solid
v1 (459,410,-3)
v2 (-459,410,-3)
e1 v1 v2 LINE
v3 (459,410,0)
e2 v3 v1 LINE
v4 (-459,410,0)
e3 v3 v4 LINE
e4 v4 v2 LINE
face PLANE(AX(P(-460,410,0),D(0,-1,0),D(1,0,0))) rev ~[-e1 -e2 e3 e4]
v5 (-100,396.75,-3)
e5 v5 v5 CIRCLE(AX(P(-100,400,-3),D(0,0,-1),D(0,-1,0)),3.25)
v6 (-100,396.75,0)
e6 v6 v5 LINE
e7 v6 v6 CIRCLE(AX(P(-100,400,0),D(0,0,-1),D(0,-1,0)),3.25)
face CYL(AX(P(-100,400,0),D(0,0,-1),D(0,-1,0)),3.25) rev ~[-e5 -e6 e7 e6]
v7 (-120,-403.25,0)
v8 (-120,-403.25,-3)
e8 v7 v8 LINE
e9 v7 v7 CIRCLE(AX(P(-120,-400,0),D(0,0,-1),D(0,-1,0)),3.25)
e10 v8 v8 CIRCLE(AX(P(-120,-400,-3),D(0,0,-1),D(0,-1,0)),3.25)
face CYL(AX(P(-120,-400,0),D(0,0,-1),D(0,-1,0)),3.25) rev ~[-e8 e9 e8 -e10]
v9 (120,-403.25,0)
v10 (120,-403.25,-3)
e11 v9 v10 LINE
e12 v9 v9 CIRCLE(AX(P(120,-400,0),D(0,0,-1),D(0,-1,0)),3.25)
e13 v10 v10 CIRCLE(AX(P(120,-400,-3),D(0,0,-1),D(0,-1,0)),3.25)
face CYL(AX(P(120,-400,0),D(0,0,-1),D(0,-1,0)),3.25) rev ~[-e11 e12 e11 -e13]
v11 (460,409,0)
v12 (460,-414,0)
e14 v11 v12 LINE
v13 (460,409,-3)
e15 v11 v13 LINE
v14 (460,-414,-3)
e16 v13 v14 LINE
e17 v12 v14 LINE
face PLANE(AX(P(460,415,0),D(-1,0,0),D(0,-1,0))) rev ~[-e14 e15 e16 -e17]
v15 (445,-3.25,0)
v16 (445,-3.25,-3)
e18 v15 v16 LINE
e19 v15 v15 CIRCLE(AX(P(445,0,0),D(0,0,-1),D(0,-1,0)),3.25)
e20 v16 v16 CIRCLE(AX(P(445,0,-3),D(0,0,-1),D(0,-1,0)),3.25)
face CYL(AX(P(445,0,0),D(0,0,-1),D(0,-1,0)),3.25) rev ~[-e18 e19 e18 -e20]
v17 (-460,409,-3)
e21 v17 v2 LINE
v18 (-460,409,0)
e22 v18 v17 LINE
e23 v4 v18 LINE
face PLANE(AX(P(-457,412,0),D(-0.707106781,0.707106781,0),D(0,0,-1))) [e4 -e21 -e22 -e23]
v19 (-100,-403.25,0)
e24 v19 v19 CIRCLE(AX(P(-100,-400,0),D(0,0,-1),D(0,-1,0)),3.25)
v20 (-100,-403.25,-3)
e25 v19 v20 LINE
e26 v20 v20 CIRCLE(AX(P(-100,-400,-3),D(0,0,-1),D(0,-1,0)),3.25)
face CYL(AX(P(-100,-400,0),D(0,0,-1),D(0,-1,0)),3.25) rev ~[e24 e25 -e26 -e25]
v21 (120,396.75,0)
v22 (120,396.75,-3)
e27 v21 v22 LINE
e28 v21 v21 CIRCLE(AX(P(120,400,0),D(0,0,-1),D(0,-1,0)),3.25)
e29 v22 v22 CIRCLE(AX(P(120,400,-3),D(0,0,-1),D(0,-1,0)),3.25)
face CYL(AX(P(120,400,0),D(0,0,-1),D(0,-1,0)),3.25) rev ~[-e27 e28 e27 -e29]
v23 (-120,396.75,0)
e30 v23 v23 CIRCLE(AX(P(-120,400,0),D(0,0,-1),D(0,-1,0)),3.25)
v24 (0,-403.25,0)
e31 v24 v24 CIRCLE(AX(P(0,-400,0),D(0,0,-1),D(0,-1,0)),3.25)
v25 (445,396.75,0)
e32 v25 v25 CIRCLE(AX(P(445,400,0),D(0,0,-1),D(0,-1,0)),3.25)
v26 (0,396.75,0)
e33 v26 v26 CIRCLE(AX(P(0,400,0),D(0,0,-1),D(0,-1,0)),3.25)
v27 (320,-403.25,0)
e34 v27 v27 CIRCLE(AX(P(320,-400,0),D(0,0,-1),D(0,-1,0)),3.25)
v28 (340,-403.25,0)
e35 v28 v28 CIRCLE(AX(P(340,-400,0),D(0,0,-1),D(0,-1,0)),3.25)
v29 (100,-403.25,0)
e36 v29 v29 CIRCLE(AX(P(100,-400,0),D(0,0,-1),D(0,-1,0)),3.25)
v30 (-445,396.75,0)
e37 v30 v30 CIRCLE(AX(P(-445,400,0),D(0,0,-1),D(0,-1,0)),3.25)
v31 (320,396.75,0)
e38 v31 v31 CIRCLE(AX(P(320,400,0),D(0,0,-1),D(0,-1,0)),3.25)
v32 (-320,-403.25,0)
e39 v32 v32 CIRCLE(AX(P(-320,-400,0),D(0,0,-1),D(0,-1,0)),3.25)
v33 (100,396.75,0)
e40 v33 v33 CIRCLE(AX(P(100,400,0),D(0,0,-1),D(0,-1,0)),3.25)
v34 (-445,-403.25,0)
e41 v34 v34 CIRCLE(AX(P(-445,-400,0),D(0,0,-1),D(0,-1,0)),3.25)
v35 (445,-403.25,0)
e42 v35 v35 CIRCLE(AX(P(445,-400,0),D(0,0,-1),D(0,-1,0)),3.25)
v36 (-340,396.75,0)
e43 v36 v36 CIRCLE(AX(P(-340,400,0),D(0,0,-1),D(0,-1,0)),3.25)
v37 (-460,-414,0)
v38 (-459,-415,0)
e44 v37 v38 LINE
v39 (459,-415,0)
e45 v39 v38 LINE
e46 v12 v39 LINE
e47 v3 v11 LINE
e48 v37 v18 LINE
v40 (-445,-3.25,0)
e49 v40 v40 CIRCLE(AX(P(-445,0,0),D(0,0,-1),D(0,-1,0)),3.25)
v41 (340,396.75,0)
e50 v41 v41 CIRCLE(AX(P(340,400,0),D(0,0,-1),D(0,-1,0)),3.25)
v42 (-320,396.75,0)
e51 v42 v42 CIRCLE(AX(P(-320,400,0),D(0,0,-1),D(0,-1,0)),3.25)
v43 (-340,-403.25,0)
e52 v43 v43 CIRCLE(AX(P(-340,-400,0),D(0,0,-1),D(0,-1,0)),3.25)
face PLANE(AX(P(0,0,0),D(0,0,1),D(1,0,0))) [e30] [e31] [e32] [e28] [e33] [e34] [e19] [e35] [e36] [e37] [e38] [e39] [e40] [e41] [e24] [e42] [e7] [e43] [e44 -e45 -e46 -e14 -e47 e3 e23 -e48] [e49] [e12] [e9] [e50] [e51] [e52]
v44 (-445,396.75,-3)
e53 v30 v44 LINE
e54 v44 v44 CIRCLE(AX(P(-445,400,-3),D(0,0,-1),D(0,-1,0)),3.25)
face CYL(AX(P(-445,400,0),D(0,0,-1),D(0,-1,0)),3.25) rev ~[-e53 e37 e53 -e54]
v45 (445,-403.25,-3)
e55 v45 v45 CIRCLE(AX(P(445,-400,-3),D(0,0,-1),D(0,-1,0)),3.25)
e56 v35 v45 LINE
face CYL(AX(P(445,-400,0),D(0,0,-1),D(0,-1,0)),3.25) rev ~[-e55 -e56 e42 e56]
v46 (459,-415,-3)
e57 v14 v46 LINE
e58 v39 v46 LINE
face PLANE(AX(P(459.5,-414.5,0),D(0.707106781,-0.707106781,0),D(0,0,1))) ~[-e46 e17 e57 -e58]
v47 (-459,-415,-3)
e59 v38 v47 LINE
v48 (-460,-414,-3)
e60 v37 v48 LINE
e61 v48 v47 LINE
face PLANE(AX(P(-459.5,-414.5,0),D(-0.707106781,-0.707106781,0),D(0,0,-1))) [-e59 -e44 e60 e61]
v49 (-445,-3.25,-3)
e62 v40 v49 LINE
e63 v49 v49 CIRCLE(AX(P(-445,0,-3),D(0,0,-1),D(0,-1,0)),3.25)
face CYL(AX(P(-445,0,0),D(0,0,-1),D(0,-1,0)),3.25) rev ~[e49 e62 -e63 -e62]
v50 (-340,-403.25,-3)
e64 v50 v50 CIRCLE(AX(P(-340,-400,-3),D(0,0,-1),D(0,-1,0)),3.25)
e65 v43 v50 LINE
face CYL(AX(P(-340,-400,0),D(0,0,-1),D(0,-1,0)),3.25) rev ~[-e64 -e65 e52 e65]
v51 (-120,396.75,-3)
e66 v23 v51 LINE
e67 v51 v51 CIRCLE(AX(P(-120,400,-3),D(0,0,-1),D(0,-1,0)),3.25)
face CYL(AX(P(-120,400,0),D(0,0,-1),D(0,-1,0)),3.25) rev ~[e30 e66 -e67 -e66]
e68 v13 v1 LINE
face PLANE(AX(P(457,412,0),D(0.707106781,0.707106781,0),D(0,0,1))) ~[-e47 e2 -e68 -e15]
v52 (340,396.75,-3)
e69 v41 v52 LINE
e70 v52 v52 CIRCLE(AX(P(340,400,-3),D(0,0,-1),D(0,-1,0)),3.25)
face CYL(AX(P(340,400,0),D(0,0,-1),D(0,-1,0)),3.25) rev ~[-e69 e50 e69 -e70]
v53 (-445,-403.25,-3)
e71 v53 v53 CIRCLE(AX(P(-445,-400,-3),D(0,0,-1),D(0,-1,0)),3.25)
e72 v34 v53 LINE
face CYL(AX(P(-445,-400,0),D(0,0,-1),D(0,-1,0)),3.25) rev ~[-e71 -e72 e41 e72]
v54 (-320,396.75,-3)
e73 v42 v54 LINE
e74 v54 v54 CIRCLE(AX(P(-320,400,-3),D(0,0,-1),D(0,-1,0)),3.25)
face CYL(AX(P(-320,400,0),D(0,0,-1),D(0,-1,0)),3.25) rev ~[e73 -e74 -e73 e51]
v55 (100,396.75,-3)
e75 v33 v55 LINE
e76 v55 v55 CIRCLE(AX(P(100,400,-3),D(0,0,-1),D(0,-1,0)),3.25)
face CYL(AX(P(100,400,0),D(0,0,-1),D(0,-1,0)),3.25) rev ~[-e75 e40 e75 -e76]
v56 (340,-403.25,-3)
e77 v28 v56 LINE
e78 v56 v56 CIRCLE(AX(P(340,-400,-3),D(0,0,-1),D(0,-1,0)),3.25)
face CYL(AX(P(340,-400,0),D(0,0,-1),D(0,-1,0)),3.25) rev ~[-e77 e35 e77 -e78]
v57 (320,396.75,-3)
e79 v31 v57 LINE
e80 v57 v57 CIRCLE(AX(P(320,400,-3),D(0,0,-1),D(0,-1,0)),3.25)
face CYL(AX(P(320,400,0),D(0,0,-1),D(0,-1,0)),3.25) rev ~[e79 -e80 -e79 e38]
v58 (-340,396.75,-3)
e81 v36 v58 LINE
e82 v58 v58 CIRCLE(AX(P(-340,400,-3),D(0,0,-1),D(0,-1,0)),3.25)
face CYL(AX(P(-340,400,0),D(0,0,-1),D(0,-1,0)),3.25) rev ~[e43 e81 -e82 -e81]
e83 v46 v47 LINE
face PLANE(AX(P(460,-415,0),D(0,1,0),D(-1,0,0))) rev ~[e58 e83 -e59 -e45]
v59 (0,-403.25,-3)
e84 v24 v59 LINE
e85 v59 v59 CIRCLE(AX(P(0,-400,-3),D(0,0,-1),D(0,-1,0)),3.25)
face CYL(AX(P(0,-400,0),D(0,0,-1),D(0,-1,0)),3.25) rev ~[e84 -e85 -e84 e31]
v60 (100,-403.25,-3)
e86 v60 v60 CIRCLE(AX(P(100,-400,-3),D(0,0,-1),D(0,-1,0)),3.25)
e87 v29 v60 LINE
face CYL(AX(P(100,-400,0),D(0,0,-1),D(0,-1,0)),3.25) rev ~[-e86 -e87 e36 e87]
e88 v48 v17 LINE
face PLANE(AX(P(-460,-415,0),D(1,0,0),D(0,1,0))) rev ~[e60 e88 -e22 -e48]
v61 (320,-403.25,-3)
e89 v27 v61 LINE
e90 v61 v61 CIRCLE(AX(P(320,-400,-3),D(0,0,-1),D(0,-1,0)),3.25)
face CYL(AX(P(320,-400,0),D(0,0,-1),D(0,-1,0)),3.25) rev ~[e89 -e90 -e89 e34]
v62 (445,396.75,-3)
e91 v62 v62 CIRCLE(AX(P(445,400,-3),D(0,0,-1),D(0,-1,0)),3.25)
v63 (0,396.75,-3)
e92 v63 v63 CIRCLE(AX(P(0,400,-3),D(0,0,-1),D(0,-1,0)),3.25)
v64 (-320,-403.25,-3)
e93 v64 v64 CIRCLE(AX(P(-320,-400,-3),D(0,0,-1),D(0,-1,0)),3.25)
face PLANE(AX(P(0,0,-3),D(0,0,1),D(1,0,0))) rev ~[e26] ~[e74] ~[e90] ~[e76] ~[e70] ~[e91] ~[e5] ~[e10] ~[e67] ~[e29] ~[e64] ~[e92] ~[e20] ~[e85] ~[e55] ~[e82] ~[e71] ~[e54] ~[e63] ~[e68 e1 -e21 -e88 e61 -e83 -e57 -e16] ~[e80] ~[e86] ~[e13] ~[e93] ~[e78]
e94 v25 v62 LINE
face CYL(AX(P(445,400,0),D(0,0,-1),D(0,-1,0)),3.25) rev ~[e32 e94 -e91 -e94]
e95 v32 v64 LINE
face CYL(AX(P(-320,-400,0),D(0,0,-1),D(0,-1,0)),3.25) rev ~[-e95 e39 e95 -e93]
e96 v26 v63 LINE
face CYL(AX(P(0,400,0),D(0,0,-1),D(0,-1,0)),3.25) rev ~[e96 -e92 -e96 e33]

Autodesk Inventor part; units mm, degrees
ref_plane "YZ Plane" through (0, 0, 0) normal (1, 0, 0) x (0, 1, 0)
ref_plane "XZ Plane" through (0, 0, 0) normal (0, 1, 0) x (-1, 0, 0)
ref_plane "XY Plane" through (0, 0, 0) normal (0, 0, 1) x (1, 0, 0)
sketch "Esboço1" plane through (0, 0, 0) normal (0, 0, 1) x (1, 0, 0)
  line L0 (-644, 0) -> (644, 0) construction
  line L1 (0, -581) -> (0, 581) construction
  line L2 (-460, 415) -> (460, 415)
  line L3 (460, 415) -> (460, -415)
  line L4 (460, -415) -> (-460, -415)
  line L5 (-460, -415) -> (-460, 415)
  line L6 (-445, 415) -> (-445, -415) construction
  line L7 (445, 415) -> (445, -415) construction
  line L8 (-460, -400) -> (460, -400) construction
  line L9 (-460, 400) -> (460, 400) construction
  line L10 (-415, 415) -> (-415, -415) construction
  line L11 (415, 415) -> (415, -415) construction
  line L12 (330, -400) -> (330, 0) construction
  line L13 (220, -400) -> (220, 0) construction
  line L14 (110, -400) -> (110, 0) construction
  line L15 (-330, -400) -> (-330, 0) construction
  line L16 (-110, -400) -> (-110, 0) construction
  point P0 (0, 0)
  point P1 (-445, -400)
  point P2 (-445, 400)
  point P3 (-445, 0)
  point P4 (0, 400)
  point P5 (445, 400)
  point P6 (445, 0)
  point P7 (0, -400)
  point P8 (445, -400)
  point P9 (340, -400)
  point P10 (320, -400)
  point P11 (100, -400)
  point P12 (120, -400)
  point P13 (-340, -400)
  point P14 (-320, -400)
  point P15 (-220, -400)
  point P16 (-120, -400)
  point P17 (-100, -400)
  point P18 (340, 400)
  point P19 (320, 400)
  point P20 (120, 400)
  point P21 (100, 400)
  point P22 (-330, 400)
  point P23 (-100, 400)
  point P24 (-120, 400)
  point P25 (-320, 400)
  point P26 (-340, 400)
  dimension "d0" = 920
  dimension "d1" = 830
  dimension "d2" = 15
  dimension "d3" = 30
  dimension "d4" = 15
  dimension "d20" = 220
  dimension "d21" = 20
  dimension "d22" = 220
extrude "Extrusão1" add sketch "Esboço1" against normal blind 3
hole "Furo1" at (-445, -400, 0) at (-445, 400, 0) at (-445, 0, 0) at (0, 400, 0) at (445, 0, 0) at (445, 400, 0) at (0, -400, 0) at (445, -400, 0) direction (0, 0, -1) diameter 6.5 end through all clearance for "Countersunk Flat Head Hex Socket Screw ISO 10642" size "M6" standard "ISO"
hole "Furo2" at (340, -400, 0) at (320, -400, 0) at (120, -400, 0) at (100, -400, 0) at (-100, -400, 0) at (-120, -400, 0) at (-320, -400, 0) at (-340, -400, 0) at (-340, 400, 0) at (-320, 400, 0) at (-120, 400, 0) at (-100, 400, 0) at (100, 400, 0) at (120, 400, 0) at (320, 400, 0) at (340, 400, 0) direction (0, 0, -1) diameter 6.5 end through all clearance for "Countersunk Flat Head Hex Socket Screw ISO 10642" size "M6" standard "ISO"
chamfer "Chanfro1" distance 1 angle 45 4 edges at (-460, -415, -1.5) (-460, 415, -1.5) (460, 415, -1.5) (460, -415, -1.5)
move faces "Mover1" translate (0, -5, 0) faces at (153, 415, -1) (459.3333, 414.6667, -1) (-459.6667, 414.3333, -1)
equation "\"d22\" = d20"
properties part number "Chapa Base (Trilho Roletado)" material "ACM WT SN"
